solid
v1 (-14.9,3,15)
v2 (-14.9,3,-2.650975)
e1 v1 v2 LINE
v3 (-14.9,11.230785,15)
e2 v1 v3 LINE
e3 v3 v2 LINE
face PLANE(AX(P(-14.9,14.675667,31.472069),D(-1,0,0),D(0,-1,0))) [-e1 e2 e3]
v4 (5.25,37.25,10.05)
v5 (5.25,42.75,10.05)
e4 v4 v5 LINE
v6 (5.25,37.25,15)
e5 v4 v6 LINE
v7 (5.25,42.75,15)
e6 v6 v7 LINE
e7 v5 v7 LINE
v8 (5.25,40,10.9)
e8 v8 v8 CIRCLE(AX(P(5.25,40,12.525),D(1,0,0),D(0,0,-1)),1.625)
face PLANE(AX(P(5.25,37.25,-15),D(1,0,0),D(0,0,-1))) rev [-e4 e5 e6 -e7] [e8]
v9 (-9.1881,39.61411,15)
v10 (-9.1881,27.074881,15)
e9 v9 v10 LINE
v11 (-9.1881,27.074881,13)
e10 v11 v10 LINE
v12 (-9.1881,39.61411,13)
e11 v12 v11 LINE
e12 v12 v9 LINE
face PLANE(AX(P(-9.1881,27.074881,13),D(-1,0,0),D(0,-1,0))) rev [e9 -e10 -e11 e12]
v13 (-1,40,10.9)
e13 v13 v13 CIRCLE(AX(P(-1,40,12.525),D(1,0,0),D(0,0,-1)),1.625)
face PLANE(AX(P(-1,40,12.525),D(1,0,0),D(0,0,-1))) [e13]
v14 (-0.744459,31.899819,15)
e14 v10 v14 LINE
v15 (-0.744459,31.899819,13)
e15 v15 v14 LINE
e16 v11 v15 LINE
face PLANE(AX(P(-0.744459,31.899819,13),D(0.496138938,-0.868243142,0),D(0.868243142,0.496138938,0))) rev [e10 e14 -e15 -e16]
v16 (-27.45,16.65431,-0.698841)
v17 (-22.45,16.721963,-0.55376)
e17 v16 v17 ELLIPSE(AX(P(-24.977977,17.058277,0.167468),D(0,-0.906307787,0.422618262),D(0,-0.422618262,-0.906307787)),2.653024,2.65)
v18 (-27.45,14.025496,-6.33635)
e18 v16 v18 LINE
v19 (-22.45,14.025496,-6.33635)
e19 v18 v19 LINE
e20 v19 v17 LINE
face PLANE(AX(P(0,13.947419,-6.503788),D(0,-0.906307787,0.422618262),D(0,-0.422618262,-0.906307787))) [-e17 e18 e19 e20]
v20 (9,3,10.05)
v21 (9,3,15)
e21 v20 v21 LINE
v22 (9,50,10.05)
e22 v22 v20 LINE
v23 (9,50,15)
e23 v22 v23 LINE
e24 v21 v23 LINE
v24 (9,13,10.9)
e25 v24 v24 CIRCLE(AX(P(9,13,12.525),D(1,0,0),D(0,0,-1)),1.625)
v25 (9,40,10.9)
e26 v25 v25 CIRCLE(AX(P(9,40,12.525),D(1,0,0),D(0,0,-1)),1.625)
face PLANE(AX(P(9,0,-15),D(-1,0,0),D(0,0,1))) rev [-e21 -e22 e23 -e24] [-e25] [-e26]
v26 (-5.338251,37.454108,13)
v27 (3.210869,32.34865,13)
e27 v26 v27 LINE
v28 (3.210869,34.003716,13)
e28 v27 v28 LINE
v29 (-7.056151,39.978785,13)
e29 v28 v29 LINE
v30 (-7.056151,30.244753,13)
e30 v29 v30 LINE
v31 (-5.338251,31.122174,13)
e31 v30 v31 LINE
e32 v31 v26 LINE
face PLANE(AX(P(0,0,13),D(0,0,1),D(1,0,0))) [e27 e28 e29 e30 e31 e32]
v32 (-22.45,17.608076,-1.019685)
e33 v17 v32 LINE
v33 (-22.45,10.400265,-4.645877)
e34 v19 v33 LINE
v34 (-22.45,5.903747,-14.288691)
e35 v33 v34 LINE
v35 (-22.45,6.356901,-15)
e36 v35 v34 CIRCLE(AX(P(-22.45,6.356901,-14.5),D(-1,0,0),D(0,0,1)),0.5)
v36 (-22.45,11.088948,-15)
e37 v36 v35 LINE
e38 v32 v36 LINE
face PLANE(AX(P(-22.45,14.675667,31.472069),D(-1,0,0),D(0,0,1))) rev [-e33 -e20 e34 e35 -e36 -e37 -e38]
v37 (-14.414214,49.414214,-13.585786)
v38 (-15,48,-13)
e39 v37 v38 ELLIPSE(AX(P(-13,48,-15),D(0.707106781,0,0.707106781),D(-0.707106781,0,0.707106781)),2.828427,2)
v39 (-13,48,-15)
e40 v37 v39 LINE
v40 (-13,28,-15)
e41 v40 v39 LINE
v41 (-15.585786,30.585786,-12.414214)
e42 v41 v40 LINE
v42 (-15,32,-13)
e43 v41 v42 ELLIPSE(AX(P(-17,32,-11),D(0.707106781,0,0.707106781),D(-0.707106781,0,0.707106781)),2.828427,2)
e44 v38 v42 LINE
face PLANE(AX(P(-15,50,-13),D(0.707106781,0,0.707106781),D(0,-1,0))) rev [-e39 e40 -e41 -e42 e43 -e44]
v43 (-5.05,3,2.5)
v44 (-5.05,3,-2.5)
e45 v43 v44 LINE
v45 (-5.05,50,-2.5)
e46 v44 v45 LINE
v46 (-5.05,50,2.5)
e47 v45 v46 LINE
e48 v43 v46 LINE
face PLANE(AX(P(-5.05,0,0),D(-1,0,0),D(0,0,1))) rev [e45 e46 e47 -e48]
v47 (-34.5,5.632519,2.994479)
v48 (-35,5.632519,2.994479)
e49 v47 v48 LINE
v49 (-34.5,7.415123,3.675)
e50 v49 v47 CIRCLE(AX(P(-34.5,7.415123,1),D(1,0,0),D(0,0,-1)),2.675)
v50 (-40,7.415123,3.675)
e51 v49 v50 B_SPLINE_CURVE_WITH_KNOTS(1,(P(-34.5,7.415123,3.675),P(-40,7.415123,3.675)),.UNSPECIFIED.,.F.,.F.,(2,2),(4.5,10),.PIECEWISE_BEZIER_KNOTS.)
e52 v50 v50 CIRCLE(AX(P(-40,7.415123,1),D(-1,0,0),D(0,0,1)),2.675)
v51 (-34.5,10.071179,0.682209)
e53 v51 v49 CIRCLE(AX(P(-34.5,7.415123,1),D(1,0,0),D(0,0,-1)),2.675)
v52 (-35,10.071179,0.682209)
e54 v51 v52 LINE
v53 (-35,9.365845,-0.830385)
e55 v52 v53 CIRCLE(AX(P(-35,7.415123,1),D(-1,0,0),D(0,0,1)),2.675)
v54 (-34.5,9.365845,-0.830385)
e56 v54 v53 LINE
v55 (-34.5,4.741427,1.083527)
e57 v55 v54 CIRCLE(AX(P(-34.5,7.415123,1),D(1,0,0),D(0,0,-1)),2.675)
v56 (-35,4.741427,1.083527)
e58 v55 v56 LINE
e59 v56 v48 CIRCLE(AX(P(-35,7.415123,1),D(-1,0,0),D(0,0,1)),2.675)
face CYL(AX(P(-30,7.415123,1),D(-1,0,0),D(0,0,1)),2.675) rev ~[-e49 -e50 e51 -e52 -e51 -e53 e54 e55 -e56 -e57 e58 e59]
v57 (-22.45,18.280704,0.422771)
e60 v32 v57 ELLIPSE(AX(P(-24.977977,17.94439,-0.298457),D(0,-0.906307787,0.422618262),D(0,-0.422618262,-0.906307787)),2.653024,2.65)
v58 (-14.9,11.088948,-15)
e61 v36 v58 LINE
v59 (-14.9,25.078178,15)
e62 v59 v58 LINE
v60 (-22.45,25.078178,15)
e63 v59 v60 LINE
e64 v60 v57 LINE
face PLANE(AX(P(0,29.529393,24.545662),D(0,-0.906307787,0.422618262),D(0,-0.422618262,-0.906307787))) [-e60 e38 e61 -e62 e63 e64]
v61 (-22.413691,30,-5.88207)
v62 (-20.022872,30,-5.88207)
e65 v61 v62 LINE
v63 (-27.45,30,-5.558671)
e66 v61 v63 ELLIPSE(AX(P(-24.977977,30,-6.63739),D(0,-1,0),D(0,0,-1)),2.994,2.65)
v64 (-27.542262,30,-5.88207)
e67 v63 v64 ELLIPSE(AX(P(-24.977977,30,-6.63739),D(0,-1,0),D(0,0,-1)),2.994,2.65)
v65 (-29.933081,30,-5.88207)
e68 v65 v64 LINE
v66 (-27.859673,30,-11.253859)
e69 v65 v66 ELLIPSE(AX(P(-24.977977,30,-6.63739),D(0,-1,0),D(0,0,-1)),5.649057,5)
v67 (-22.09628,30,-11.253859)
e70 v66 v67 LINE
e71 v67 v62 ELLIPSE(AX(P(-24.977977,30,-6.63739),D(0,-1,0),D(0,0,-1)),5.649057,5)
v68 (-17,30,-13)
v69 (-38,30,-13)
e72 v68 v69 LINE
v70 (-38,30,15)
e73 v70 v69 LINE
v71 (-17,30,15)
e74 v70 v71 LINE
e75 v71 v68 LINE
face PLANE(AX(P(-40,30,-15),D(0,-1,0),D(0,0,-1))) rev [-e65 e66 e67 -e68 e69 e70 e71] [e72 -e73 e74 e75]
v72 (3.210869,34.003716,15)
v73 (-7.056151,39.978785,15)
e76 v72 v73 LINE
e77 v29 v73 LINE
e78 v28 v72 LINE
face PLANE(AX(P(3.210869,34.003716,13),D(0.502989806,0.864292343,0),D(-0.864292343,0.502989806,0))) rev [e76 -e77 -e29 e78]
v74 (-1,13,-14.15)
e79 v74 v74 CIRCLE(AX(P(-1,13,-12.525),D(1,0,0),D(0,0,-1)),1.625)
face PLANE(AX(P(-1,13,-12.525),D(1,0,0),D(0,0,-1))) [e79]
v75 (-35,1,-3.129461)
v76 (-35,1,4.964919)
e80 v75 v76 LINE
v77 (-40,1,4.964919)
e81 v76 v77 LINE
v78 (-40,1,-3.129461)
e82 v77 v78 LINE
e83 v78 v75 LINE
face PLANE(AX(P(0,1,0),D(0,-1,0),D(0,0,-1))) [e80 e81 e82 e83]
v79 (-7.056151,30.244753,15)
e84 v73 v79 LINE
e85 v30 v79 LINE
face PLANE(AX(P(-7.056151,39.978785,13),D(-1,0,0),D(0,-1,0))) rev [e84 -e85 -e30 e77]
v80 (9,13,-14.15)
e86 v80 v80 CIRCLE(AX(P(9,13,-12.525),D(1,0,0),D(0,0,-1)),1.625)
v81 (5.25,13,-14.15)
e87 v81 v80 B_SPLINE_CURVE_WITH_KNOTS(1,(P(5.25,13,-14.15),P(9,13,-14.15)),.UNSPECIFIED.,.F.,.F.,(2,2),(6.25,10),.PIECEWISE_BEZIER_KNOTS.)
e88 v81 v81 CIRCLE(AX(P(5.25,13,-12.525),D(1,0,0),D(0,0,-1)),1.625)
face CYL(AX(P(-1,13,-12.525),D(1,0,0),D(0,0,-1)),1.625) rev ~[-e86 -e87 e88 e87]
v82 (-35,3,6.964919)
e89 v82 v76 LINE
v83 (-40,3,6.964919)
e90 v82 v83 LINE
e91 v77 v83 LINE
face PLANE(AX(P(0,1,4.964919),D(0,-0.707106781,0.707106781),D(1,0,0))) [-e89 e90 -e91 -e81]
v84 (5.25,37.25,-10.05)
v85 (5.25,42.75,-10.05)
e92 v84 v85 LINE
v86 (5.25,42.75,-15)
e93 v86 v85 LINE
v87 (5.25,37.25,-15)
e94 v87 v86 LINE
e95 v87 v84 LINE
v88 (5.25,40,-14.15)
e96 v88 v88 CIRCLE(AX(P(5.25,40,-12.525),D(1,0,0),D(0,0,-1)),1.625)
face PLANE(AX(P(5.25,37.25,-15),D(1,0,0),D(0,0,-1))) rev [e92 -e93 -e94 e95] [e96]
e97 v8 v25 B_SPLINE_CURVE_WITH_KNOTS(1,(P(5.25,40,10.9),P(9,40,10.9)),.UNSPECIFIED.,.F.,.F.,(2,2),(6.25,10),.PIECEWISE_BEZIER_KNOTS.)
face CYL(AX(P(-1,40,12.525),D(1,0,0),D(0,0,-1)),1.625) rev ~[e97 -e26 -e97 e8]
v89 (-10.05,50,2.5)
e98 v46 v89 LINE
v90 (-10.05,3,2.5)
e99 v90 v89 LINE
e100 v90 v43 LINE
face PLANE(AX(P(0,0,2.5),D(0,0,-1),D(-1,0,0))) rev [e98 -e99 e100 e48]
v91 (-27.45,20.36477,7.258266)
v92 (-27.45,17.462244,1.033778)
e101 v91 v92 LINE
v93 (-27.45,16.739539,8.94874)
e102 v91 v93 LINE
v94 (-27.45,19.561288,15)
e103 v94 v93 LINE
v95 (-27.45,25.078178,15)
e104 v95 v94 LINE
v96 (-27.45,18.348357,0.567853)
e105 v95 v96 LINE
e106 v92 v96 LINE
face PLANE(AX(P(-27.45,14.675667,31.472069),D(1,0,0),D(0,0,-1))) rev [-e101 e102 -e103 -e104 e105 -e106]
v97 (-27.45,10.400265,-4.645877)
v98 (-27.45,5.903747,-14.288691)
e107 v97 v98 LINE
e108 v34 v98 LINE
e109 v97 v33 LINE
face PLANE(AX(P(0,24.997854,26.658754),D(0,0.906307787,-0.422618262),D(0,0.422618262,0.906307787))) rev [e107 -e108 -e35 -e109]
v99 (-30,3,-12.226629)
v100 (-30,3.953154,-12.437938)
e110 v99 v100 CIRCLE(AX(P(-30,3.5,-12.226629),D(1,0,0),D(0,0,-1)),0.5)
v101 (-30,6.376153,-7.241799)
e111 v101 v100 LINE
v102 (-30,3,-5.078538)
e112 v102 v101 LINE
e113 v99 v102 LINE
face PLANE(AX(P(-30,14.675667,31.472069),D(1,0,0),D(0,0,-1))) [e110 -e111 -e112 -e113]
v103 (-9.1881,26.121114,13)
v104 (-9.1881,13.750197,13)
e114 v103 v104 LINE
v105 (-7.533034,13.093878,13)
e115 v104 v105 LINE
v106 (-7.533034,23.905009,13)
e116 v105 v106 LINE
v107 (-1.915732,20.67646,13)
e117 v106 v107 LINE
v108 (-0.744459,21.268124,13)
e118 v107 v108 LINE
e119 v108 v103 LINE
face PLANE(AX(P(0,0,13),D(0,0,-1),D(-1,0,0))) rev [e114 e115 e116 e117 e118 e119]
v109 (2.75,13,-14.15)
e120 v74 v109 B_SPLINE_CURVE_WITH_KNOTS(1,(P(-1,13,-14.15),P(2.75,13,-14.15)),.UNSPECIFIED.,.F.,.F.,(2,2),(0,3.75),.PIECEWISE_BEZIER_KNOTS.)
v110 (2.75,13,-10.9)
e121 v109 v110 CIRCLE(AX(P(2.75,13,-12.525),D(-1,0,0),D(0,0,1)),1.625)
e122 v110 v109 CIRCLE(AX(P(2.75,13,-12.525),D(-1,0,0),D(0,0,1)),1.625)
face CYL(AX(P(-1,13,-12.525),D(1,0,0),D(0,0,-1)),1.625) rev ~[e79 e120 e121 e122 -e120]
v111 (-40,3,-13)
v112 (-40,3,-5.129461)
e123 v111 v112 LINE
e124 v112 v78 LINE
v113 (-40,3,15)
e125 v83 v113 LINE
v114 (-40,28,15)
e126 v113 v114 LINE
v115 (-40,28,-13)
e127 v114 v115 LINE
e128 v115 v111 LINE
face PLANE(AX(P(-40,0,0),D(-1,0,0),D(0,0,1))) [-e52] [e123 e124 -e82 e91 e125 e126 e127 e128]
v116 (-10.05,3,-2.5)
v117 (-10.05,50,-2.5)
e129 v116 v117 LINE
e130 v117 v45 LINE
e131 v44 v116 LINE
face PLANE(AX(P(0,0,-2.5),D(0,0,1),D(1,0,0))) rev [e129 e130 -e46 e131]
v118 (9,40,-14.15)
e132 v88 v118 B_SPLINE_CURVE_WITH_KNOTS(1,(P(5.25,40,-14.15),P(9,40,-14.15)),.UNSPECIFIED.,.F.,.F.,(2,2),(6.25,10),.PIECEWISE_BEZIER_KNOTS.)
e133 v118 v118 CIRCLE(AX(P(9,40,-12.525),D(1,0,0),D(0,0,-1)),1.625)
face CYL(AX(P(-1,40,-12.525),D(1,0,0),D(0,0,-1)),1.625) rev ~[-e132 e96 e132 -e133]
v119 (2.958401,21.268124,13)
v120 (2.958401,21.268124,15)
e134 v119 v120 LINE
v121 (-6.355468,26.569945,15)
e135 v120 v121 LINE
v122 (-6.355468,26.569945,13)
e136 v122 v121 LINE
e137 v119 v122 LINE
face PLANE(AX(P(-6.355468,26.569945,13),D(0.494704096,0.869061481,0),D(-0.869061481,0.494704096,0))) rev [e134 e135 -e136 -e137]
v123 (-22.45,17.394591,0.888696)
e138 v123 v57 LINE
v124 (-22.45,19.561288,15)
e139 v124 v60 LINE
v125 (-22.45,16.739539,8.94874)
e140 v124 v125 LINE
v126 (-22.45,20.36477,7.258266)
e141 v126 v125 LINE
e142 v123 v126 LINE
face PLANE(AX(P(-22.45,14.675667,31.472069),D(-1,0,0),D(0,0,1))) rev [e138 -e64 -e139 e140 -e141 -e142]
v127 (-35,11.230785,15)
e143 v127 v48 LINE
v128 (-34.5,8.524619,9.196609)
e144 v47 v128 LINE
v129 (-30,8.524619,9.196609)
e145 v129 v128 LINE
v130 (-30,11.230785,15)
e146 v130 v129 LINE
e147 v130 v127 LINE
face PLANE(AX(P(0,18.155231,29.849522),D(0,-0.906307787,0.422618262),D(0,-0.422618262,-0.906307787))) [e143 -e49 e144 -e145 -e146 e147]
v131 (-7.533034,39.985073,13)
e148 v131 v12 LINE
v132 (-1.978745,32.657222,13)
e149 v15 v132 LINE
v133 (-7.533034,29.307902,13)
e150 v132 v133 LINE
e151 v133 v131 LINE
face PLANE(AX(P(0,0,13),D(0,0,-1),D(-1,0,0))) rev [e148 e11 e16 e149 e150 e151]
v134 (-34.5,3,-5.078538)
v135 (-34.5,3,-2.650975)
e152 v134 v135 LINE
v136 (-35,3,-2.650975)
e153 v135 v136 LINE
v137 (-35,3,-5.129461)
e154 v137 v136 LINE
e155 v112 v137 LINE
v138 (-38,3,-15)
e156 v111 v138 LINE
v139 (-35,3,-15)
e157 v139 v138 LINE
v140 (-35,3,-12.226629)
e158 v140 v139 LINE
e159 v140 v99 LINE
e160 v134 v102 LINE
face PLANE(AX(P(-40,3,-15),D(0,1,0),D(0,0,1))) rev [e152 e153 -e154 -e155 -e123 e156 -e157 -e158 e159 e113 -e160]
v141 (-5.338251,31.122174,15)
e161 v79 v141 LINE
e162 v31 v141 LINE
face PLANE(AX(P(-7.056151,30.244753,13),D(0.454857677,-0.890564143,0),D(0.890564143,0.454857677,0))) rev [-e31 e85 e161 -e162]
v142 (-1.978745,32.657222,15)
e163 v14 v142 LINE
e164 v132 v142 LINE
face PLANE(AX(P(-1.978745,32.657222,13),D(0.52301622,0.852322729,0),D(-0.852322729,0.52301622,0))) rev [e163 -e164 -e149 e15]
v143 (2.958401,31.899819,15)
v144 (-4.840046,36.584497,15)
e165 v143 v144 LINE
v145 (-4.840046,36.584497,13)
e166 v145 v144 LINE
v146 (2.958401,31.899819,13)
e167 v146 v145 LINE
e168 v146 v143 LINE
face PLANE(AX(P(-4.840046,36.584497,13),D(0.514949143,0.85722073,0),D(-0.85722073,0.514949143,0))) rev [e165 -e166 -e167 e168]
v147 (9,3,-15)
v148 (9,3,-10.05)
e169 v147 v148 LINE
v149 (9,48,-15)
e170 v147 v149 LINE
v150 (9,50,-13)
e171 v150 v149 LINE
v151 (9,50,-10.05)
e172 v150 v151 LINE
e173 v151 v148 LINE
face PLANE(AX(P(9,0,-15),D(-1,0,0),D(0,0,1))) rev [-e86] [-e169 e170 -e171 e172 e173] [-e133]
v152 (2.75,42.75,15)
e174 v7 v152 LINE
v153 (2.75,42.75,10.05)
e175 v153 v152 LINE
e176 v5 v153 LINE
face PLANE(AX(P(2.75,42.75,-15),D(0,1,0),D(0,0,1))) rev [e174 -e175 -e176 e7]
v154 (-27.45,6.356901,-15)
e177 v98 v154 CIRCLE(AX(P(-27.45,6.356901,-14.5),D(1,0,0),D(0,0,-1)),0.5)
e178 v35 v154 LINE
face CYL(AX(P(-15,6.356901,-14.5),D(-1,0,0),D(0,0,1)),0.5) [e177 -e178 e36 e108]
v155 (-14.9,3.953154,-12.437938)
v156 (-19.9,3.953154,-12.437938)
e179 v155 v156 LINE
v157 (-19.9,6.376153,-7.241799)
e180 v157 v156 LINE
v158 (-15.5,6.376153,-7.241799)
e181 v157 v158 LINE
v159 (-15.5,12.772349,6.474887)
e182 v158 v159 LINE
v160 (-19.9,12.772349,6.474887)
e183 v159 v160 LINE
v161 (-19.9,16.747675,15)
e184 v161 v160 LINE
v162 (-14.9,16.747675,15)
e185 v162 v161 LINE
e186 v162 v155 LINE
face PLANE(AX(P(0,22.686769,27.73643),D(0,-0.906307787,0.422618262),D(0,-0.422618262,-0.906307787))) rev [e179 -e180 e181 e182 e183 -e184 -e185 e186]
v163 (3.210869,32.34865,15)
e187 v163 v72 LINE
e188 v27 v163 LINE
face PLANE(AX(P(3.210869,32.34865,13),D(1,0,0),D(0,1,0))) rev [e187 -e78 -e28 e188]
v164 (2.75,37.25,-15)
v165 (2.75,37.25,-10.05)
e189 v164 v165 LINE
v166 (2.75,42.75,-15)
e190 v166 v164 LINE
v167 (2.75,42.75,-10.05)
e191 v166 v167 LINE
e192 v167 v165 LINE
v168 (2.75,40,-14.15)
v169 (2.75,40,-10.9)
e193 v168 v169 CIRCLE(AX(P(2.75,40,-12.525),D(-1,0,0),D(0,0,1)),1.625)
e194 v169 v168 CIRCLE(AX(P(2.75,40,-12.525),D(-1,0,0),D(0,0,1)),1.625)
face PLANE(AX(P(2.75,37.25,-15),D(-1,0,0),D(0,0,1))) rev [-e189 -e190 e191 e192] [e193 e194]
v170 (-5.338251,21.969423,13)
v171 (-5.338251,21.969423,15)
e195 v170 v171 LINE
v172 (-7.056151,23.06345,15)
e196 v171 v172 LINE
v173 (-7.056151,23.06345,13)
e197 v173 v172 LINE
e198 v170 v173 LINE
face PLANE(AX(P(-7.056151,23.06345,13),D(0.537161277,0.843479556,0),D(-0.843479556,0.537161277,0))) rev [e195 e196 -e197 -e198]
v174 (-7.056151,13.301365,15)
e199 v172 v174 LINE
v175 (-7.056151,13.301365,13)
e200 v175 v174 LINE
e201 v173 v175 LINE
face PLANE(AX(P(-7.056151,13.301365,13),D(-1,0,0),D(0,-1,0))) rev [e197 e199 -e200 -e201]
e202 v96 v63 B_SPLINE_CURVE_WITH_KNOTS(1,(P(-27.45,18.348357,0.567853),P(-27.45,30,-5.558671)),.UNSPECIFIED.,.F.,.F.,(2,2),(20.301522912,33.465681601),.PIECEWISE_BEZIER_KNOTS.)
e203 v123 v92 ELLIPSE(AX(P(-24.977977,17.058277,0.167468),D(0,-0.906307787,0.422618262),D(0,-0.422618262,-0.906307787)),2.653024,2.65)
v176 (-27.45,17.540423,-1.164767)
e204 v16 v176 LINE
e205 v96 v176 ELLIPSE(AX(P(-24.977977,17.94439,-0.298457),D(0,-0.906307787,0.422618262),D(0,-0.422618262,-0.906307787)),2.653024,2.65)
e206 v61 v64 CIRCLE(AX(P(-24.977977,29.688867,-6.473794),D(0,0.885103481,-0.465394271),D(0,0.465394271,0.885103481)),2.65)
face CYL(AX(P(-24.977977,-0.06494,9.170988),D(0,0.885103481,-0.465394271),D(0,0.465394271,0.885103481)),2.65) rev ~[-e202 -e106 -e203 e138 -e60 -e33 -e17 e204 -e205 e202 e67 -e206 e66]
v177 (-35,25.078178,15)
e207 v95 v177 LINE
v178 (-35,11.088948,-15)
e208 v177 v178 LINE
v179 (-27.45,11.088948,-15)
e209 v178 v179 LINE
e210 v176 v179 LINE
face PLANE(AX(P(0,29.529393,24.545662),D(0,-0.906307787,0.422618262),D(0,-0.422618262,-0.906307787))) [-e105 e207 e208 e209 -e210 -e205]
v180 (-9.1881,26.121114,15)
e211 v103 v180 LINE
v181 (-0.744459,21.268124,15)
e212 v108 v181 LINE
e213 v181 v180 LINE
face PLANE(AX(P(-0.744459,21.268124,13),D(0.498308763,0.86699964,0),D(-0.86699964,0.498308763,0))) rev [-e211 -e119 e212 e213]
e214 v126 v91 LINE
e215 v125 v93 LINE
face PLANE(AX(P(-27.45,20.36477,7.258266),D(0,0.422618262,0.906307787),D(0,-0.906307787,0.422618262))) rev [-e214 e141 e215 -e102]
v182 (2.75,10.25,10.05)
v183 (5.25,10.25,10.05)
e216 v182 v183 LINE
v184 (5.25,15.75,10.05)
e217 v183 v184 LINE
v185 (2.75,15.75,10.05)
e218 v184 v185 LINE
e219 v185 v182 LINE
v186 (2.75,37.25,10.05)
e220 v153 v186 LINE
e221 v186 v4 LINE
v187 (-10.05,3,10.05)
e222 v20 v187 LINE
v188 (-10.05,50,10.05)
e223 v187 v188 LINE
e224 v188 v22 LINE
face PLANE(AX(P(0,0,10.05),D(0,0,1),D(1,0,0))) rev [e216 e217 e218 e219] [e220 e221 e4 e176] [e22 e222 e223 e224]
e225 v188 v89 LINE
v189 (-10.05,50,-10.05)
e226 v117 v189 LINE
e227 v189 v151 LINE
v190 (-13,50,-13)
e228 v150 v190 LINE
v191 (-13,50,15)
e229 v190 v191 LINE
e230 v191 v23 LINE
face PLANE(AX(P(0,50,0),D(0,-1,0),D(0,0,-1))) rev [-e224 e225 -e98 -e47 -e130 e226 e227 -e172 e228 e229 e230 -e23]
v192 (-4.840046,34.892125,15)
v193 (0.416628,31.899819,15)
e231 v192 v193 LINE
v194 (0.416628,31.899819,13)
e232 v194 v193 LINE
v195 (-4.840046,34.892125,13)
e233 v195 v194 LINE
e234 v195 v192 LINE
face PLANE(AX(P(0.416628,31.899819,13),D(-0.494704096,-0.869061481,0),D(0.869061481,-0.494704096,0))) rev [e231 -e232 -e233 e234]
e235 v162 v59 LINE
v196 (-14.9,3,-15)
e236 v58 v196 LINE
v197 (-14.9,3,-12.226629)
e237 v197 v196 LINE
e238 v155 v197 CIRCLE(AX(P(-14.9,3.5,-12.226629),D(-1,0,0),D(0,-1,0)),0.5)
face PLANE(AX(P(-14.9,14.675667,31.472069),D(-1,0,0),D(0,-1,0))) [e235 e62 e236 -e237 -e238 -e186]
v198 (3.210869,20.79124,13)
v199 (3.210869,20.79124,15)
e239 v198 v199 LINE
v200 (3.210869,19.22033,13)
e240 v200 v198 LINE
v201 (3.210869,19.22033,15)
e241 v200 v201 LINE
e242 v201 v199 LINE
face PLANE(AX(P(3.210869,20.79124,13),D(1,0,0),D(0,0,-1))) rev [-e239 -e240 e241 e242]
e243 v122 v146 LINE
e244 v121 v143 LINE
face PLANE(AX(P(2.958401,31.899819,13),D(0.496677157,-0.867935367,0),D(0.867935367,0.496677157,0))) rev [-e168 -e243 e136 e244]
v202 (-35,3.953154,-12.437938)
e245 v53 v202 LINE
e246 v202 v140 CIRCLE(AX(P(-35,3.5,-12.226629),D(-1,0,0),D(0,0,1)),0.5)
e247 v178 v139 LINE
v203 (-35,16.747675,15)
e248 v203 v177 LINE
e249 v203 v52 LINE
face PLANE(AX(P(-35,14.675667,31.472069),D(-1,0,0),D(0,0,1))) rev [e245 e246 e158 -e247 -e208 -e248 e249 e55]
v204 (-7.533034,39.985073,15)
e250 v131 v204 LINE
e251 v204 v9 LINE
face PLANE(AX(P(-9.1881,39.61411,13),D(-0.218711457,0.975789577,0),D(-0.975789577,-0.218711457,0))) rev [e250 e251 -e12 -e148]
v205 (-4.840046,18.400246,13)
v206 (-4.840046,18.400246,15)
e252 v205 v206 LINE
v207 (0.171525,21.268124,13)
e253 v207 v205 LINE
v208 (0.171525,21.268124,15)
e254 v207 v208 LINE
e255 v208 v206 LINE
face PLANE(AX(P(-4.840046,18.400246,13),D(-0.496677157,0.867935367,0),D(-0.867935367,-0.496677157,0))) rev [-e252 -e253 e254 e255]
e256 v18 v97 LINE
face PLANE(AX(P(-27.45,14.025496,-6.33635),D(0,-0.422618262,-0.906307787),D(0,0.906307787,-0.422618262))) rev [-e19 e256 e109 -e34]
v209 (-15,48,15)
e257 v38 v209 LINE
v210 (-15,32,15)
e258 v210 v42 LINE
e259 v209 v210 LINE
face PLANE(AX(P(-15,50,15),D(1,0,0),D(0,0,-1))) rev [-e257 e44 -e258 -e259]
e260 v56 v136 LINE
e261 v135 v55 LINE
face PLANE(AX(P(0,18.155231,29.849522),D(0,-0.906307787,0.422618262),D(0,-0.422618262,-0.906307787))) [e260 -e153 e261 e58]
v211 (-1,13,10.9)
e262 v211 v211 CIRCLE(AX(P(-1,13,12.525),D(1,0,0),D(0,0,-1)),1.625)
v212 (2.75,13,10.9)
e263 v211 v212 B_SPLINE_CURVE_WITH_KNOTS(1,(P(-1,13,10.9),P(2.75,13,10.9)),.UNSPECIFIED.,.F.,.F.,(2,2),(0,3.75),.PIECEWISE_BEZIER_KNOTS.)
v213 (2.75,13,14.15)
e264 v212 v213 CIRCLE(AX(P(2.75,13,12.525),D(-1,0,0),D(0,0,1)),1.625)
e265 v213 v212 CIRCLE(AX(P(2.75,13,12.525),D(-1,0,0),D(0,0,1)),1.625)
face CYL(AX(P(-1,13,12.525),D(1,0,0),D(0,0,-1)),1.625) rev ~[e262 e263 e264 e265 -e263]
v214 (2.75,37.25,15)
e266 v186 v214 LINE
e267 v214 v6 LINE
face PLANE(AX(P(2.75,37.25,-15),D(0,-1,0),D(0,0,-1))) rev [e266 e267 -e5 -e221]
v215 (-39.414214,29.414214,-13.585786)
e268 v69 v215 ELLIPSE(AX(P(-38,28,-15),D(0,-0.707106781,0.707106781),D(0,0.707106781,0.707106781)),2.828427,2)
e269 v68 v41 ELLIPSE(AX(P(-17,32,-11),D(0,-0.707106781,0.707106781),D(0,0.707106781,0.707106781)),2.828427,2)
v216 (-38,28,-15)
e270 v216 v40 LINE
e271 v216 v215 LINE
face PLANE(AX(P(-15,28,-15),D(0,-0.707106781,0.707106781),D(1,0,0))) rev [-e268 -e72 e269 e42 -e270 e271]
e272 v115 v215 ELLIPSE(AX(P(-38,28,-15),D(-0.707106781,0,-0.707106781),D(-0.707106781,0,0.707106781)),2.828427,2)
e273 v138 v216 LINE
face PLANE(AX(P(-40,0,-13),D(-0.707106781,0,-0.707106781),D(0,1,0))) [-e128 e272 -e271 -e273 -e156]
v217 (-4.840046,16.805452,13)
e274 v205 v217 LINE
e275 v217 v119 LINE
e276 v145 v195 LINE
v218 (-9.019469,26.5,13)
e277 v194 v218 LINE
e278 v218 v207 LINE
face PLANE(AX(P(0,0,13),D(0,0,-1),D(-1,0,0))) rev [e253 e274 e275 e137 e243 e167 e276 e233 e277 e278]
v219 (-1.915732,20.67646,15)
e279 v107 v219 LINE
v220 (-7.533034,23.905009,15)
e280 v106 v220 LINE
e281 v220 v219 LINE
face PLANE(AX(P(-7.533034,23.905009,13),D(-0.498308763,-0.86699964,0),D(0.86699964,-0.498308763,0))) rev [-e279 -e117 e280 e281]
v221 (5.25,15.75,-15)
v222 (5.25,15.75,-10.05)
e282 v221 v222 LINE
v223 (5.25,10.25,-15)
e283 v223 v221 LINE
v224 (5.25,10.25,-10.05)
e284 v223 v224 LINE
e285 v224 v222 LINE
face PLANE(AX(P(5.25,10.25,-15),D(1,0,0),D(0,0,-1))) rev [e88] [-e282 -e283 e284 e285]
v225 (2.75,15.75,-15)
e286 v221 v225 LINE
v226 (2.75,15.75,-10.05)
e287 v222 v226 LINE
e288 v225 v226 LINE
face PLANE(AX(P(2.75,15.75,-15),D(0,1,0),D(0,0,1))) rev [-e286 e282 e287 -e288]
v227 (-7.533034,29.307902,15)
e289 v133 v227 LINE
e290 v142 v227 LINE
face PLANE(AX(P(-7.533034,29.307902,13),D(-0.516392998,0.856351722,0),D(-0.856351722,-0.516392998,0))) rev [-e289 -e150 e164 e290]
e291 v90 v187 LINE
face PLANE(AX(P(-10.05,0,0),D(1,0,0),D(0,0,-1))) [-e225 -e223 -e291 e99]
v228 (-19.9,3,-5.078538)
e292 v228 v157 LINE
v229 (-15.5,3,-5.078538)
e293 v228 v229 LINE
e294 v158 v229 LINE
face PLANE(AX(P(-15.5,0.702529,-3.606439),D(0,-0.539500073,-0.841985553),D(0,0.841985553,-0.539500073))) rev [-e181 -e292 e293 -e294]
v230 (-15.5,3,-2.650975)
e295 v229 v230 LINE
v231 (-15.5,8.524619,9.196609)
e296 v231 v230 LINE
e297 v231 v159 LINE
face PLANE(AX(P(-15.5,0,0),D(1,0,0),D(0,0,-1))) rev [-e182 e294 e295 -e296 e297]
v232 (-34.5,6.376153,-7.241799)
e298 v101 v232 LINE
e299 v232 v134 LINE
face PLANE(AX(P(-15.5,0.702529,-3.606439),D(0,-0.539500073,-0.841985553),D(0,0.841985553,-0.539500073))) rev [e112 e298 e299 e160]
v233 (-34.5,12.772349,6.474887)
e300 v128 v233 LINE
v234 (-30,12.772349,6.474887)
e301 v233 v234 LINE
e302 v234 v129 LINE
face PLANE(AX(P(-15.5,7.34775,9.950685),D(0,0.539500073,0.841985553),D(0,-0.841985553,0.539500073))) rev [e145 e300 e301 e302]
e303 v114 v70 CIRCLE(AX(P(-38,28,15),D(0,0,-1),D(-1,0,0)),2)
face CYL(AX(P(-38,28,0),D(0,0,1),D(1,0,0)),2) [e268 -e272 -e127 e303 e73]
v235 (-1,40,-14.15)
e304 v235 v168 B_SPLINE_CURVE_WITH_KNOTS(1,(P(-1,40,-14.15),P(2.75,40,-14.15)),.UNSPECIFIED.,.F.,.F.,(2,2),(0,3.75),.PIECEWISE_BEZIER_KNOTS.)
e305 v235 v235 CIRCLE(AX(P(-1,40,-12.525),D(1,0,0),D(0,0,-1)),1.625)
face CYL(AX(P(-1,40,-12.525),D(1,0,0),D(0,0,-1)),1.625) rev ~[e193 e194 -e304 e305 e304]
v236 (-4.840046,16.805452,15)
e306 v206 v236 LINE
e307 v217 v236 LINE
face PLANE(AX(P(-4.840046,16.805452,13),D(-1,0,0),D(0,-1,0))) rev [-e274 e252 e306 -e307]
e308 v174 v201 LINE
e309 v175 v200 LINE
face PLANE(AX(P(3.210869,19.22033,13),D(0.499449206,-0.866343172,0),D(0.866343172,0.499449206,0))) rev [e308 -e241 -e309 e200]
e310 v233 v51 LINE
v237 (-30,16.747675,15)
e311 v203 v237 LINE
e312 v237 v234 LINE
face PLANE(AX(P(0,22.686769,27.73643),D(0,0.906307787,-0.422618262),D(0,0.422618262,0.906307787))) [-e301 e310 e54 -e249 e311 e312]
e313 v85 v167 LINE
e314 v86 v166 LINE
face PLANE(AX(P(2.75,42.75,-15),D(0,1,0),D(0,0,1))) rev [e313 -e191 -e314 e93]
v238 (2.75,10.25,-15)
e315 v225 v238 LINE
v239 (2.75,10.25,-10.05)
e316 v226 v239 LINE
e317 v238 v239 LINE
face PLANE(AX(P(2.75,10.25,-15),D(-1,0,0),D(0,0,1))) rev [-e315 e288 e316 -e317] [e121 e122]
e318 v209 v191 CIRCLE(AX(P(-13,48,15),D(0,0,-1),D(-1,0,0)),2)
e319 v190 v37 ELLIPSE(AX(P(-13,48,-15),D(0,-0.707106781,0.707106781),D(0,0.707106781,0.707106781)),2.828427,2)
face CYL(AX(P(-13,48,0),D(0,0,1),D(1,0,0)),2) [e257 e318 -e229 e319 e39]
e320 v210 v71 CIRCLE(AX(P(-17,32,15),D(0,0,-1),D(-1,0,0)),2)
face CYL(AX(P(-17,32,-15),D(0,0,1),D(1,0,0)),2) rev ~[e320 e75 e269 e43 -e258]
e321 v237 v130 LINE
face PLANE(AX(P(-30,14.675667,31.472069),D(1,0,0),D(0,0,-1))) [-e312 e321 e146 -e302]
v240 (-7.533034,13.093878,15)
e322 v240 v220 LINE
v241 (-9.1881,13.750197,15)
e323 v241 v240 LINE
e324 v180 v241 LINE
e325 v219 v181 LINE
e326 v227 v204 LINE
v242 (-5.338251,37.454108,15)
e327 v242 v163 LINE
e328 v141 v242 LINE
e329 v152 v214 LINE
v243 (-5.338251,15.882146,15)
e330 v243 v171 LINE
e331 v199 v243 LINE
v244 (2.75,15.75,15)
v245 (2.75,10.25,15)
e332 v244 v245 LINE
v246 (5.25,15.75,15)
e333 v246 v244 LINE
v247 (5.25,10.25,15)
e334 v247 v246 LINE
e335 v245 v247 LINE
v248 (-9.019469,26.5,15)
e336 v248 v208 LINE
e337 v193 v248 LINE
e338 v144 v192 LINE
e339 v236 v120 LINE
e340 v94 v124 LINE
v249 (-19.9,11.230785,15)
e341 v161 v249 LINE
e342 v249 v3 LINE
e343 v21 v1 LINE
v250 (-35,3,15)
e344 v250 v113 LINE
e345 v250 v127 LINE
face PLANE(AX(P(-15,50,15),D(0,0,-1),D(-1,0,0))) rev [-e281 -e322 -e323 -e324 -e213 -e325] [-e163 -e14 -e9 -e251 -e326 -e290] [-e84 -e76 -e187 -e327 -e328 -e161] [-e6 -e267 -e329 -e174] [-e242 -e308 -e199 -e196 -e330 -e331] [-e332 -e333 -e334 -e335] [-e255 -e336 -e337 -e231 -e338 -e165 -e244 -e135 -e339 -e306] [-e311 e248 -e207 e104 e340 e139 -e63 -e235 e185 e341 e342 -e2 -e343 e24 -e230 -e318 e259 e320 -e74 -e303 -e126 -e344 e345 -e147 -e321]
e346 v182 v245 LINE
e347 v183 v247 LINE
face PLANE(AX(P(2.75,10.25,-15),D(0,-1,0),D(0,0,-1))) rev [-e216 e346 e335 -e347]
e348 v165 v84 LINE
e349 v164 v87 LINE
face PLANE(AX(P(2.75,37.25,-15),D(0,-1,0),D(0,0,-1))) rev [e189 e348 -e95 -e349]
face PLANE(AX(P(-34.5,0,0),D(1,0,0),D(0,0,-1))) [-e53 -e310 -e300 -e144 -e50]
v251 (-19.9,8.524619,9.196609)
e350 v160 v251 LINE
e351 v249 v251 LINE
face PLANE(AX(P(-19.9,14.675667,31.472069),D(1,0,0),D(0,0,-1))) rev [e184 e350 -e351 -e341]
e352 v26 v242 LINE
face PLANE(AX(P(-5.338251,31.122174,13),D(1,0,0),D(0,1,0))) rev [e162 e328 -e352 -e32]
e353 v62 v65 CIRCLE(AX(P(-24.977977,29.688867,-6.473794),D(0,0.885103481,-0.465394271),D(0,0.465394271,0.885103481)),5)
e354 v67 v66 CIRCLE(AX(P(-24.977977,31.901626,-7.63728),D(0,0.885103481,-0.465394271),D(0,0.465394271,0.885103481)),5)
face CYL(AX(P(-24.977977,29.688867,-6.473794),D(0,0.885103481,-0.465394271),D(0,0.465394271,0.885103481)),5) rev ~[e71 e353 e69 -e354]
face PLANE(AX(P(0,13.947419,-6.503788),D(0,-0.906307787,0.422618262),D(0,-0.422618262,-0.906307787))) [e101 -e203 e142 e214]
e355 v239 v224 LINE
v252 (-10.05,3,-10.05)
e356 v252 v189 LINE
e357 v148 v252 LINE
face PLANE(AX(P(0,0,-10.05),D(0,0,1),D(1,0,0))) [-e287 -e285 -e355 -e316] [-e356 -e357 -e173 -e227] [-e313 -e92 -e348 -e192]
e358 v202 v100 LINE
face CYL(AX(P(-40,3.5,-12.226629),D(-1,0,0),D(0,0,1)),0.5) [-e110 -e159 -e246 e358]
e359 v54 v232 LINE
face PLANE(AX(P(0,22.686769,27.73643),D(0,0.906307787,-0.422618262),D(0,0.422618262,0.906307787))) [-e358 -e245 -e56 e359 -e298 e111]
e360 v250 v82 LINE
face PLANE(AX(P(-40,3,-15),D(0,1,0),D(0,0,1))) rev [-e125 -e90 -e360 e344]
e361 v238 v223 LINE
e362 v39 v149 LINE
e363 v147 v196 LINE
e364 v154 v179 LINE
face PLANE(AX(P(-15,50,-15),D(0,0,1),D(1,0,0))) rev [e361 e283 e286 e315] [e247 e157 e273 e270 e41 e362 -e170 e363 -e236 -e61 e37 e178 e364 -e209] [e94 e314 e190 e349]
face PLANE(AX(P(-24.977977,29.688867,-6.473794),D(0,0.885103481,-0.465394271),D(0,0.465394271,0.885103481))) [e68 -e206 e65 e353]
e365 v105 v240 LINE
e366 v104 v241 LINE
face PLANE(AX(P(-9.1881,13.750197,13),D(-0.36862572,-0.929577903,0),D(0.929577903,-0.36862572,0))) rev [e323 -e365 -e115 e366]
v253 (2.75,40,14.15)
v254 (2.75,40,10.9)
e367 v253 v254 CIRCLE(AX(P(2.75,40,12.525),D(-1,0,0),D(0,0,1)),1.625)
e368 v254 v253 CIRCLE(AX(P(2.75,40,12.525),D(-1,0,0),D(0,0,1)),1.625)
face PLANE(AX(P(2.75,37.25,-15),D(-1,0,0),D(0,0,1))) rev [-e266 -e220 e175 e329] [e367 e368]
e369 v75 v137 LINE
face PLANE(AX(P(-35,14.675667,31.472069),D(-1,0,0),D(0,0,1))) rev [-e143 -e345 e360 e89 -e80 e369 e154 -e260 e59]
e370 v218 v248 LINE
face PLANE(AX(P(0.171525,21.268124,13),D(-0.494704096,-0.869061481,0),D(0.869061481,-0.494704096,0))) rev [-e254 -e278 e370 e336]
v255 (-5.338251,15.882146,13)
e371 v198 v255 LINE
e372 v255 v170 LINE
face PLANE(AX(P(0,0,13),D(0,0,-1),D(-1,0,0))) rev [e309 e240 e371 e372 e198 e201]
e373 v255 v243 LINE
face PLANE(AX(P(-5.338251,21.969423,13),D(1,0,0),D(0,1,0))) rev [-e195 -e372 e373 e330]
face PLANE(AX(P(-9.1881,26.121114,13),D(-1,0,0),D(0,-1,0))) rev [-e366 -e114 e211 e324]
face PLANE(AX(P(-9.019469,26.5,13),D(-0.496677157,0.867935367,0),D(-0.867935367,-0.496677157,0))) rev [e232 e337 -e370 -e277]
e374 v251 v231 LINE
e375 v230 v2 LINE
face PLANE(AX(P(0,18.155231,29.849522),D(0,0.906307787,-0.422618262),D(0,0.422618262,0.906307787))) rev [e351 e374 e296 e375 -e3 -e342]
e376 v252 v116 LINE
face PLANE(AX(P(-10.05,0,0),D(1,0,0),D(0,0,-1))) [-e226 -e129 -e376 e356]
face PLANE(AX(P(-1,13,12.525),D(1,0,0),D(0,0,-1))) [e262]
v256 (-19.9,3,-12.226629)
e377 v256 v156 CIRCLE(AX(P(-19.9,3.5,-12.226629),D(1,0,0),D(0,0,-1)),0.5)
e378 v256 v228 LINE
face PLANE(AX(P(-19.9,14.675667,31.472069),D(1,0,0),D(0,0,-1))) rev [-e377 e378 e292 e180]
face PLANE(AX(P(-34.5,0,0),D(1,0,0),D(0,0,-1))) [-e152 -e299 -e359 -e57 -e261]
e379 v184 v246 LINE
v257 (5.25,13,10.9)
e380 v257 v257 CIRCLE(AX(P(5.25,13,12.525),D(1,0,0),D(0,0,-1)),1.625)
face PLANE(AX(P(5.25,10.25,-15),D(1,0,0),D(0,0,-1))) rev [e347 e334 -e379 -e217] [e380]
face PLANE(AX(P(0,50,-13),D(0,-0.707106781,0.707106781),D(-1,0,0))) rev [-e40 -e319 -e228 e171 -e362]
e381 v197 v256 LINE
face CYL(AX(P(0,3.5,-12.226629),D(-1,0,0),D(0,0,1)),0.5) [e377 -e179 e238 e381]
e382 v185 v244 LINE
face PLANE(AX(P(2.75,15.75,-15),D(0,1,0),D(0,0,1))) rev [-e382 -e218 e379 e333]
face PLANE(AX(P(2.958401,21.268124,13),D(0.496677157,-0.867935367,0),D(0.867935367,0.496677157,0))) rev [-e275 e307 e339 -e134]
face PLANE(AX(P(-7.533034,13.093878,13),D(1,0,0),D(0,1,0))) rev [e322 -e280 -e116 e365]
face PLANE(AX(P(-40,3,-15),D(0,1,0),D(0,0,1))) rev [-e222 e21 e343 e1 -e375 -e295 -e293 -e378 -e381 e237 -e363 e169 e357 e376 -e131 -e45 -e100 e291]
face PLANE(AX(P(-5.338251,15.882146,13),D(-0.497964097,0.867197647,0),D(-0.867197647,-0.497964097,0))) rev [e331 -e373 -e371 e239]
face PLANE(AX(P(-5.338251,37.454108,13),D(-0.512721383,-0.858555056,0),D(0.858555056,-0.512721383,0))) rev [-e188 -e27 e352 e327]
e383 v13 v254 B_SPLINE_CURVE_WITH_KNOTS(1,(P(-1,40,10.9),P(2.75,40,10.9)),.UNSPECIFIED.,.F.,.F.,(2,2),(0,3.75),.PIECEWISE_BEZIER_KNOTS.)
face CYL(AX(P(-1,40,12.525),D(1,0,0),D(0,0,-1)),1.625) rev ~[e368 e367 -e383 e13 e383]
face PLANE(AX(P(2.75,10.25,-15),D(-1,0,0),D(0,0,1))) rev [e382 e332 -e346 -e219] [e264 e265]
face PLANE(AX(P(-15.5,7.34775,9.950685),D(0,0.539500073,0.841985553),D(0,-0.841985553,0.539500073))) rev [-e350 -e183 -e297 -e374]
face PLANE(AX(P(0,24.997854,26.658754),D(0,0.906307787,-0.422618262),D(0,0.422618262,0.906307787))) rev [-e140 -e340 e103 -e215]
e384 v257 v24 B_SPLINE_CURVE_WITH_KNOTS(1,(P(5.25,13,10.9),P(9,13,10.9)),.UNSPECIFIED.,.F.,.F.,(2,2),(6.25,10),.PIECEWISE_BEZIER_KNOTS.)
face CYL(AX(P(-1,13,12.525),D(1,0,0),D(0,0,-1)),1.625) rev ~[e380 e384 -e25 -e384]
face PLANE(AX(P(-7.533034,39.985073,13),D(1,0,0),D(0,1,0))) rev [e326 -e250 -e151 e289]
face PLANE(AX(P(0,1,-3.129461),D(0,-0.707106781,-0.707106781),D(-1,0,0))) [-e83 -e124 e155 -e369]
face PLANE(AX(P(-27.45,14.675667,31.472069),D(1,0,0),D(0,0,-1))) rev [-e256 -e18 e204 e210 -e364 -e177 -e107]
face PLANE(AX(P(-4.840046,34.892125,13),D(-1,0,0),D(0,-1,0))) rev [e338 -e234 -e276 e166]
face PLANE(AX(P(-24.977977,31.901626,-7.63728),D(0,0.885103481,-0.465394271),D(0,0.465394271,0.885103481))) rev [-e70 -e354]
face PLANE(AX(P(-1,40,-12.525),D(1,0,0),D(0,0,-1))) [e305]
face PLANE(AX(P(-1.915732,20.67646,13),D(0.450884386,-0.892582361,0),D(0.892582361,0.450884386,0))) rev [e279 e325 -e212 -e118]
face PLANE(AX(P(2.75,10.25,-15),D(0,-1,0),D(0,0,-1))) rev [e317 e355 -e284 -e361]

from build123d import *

# Parameters (mm, degrees)
SKETCH1_W                       = 30
SKETCH1_H                       = 30
BOSS_EXTRUDE1_DEPTH             = 50
CUT_EXTRUDE1_DEPTH              = 55.313902456
SKETCH3_W                       = 6
SKETCH3_H                       = 30
CUT_EXTRUDE2_DEPTH              = 55.313902456
SKETCH5_W                       = 30
SKETCH5_H                       = 30
BOSS_EXTRUDE2_DEPTH             = 25
F_45_DEGREE_EXTRUSION_CUT_DEPTH = 73.926037689
SKETCH11_R                      = 1.625
CUT_EXTRUDE7_DEPTH              = 10
CHAMFER1_SIZE                   = 2
FILLET1_R                       = 2
SKETCH16_R                      = 2.675
CUT_EXTRUDE10_DEPTH             = 10
CUT_EXTRUDE11_DEPTH             = 9.5
FILLET2_R                       = 0.5
FILLET3_R                       = 0.5
SKETCH19_W                      = 49
SKETCH19_H                      = 3
CUT_EXTRUDE12_DEPTH             = 71.710678119
SKETCH20_W                      = 6.753728314
SKETCH20_H                      = 6.253099935
CUT_EXTRUDE13_DEPTH             = 15
SKETCH22_R                      = 2.65
CUT_EXTRUDE14_DEPTH             = 51.035604398
SKETCH23_R                      = 5
CUT_EXTRUDE15_DEPTH             = 2.5
SKETCH24_W                      = 5
SKETCH24_H                      = 15
CUT_EXTRUDE16_DEPTH             = 4
SKETCH25_W                      = 5
SKETCH25_H                      = 12.094379765
BOSS_EXTRUDE3_DEPTH             = 2
CHAMFER2_SIZE                   = 2
SKETCH26_W                      = 2.5
SKETCH26_H                      = 5.5
CUT_EXTRUDE17_DEPTH             = 71.710678119
FILLET4_R                       = 0.5
CUT_EXTRUDE18_DEPTH             = 2


with BuildPart() as part:
    # Sketch1 → Boss-Extrude1 (new body)
    with BuildSketch(Plane(origin=(0, 0, 0), x_dir=(1, 0, 0), z_dir=(0, 1, 0))):
        Rectangle(SKETCH1_W, SKETCH1_H)
    extrude(amount=BOSS_EXTRUDE1_DEPTH)

    # Sketch2 → Cut-Extrude1 (cut, through all)
    with BuildSketch(Plane(origin=(0, 50, 0), x_dir=(1, 0, 0), z_dir=(0, 1, 0))):
        Polygon((-10.05, -2.5), (-10.05, -10.05), (10.05, -10.05), (10.05, 10.05), (-10.05, 10.05), (-10.05, 2.5), (-5.05, 2.5), (-5.05, -2.5), align=None)
    extrude(amount=-CUT_EXTRUDE1_DEPTH, mode=Mode.SUBTRACT)

    # Sketch3 → Cut-Extrude2 (cut, through all)
    with BuildSketch(Plane(origin=(0, 50, 0), x_dir=(1, 0, 0), z_dir=(0, 1, 0))):
        with Locations((12, 0)):
            Rectangle(SKETCH3_W, SKETCH3_H)
    extrude(amount=-CUT_EXTRUDE2_DEPTH, mode=Mode.SUBTRACT)

    # Sketch5 → Boss-Extrude2 (add)
    with BuildSketch(Plane.ZY.offset(15)):
        with Locations((0, 15)):
            Rectangle(SKETCH5_W, SKETCH5_H)
    extrude(amount=BOSS_EXTRUDE2_DEPTH)

    # Sketch7 → 45 degree extrusion cut (cut, through all)
    with BuildSketch(Plane(origin=(-40, 12.069825676, -23.451382923), x_dir=(-1, 0, 0), z_dir=(0, -0.42261826174069717, -0.9063077870366509))):
        Polygon((-25.1, -17.010685759), (-25.1, -24.560685759), (-17.55, -24.560685759), (-17.55, -19.560685759), (-12.55, -19.560685759), (-12.55, -24.560685759), (-5, -24.560685759), (-5, -17.010685759), (-10, -17.010685759), (-10, -14.510685759), (-20.1, -14.510685759), (-20.1, -17.010685759), align=None)
        Polygon((-25.1, -4.460685759), (-25.1, -12.010685759), (-20.1, -12.010685759), (-20.1, -14.510685759), (-10, -14.510685759), (-10, -12.010685759), (-5, -12.010685759), (-5, -4.460685759), (-12.55, -4.460685759), (-12.55, -9.460685759), (-17.55, -9.460685759), (-17.55, -4.460685759), align=None)
    extrude(amount=-F_45_DEGREE_EXTRUSION_CUT_DEPTH, mode=Mode.SUBTRACT)

    # Sketch11 → Cut-Extrude7 (cut)
    with BuildSketch(Plane(origin=(9, 0, 0), x_dir=(0, 0, -1), z_dir=(1, 0, 0))):
        with Locations((-12.525, 40)):
            Circle(SKETCH11_R)
        with Locations((12.525, 40)):
            Circle(SKETCH11_R)
        with Locations((12.525, 13)):
            Circle(SKETCH11_R)
        with Locations((-12.525, 13)):
            Circle(SKETCH11_R)
    extrude(amount=-CUT_EXTRUDE7_DEPTH, mode=Mode.SUBTRACT)

    # Chamfer1
    chamfer1_edges = [part.edges().sort_by_distance(p)[0] for p in [
        (-5.45, 0, -15),
        (-3, 50, -15),
        (-27.5, 30, -15),
        (-40, 15, -15),
        (-15, 40, -15),
        (-35, 0, -15),
    ]]
    chamfer(chamfer1_edges, length=CHAMFER1_SIZE)

    # Fillet1
    fillet1_edges = [part.edges().sort_by_distance(p)[0] for p in [
        (-15, 50, 1),
        (-15, 30, 1),
        (-40, 30, 1),
        (-40, 0, 1),
    ]]
    fillet(fillet1_edges, radius=FILLET1_R)

    # Sketch16 → Cut-Extrude10 (cut)
    with BuildSketch(Plane.ZY.offset(40)):
        with Locations((1, 7.415122828)):
            Circle(SKETCH16_R)
    extrude(amount=-CUT_EXTRUDE10_DEPTH, mode=Mode.SUBTRACT)

    # Sketch18 → Cut-Extrude11 (cut, symmetric)
    with BuildSketch(Plane.ZY.offset(25)):
        Polygon((9.950685103, 7.347750191), (5.606439218, 14.127716409), (-7.950685103, 7.482495466), (-3.606439218, 0.702529248), align=None)
    extrude(amount=CUT_EXTRUDE11_DEPTH, both=True, mode=Mode.SUBTRACT)

    # Fillet2
    fillet2_edges = [part.edges().sort_by_distance(p)[0] for p in [
        (-24.95, 0, -3.050682005),
    ]]
    fillet(fillet2_edges, radius=FILLET2_R)

    # Fillet3
    fillet3_edges = [part.edges().sort_by_distance(p)[0] for p in [
        (-24.95, 8.417171254, 15),
    ]]
    fillet(fillet3_edges, radius=FILLET3_R)

    # Sketch19 → Cut-Extrude12 (cut, through all)
    with BuildSketch(Plane.XY.offset(15)):
        with Locations((-15.5, 1.5)):
            Rectangle(SKETCH19_W, SKETCH19_H)
    extrude(amount=-CUT_EXTRUDE12_DEPTH, mode=Mode.SUBTRACT)


with BuildPart() as cut_extrude12_piece_1:
    # of the separate pieces the step leaves, piece 1, a body of its own (cut_extrude12_pieces)
    add(part.part.solids().sort_by_distance((-14.9, 3, 15))[0])

    # Sketch22 → Cut-Extrude14 (cut, through all)
    with BuildSketch(Plane(origin=(-25, 31.908299393, -7.624586929), x_dir=(1, 0, 0), z_dir=(3.142436568436473e-15, 0.8851034809979968, -0.46539427147874146))):
        with Locations(Location((0.022023463, 0.014340274, 0), (0, 0, 201.118214674))):
            Circle(SKETCH22_R)
    extrude(amount=-CUT_EXTRUDE14_DEPTH, mode=Mode.SUBTRACT)

    # Sketch23 → Cut-Extrude15 (cut)
    with BuildSketch(Plane(origin=(-25, 31.908299393, -7.624586929), x_dir=(1, 0, 0), z_dir=(3.142436568436473e-15, 0.8851034809979968, -0.46539427147874146))):
        with Locations((0.022023463, 0.014340274)):
            Circle(SKETCH23_R)
    extrude(amount=-CUT_EXTRUDE15_DEPTH, mode=Mode.SUBTRACT)

    # Sketch24 → Cut-Extrude16 (cut)
    with BuildSketch(Plane(origin=(0, 10.322187648, -4.813315149), x_dir=(1, 0, 0), z_dir=(0, -0.906307787036651, 0.4226182617406971))):
        with Locations((-24.95, 7.684747226)):
            Rectangle(SKETCH24_W, SKETCH24_H)
    extrude(amount=-CUT_EXTRUDE16_DEPTH, mode=Mode.SUBTRACT)

    # Sketch25 → Boss-Extrude3 (add)
    with BuildSketch(Plane.XZ.offset(-3)):
        with Locations((-37.5, 0.91772931)):
            Rectangle(SKETCH25_W, SKETCH25_H)
    extrude(amount=BOSS_EXTRUDE3_DEPTH)

    # Chamfer2
    chamfer2_edges = [cut_extrude12_piece_1.edges().sort_by_distance(p)[0] for p in [
        (-37.5, 1, -5.129460572),
        (-37.5, 1, 6.964919193),
    ]]
    chamfer(chamfer2_edges, length=CHAMFER2_SIZE - 0.0001)  # a hair under: the kernel refuses the full size

    # Sketch26 → Cut-Extrude17 (cut, through all)
    with BuildSketch(Plane.XY.offset(15)):
        with Locations((4, 40)):
            Rectangle(SKETCH26_W, SKETCH26_H)
        with Locations((4, 13)):
            Rectangle(SKETCH26_W, SKETCH26_H)
    extrude(amount=-CUT_EXTRUDE17_DEPTH, mode=Mode.SUBTRACT)

    # Fillet4
    fillet4_edges = [cut_extrude12_piece_1.edges().sort_by_distance(p)[0] for p in [
        (-32.5, 3, -14.481983196),
        (-24.95, 5.572058491, -15),
        (-17.4, 3, -14.481983196),
    ]]
    fillet(fillet4_edges, radius=FILLET4_R)

    # Mobious Logo → Cut-Extrude18 (cut)
    with BuildSketch(Plane(origin=(0, 0, 15), x_dir=(-1, 0, 0), z_dir=(0, 0, 1))):
        Polygon((-3.210868628, -32.348650408), (-3.210868628, -34.003716414), (7.056151005, -39.978785217), (7.056151005, -30.244752942), (5.33825141, -31.122174097), (5.33825141, -37.454108258), align=None)
        Polygon((1.978745121, -32.657222036), (0.744458608, -31.899818949), (9.188100437, -27.07488076), (9.188100437, -39.614109657), (7.533034431, -39.985072727), (7.533034431, -29.307901849), align=None)
        Polygon((4.840045674, -36.584497306), (-2.958400932, -31.899818949), (6.355467669, -26.569945368), (-2.958400932, -21.268123754), (4.840045674, -16.805452407), (4.840045674, -18.400245934), (-0.171524822, -21.268123754), (9.019468658, -26.5), (-0.416628352, -31.899818949), (4.840045674, -34.892125279), align=None)
        Polygon((-3.210868628, -20.791240329), (-3.210868628, -19.220330221), (7.056151005, -13.30136535), (7.056151005, -23.063449592), (5.33825141, -21.96942291), (5.33825141, -15.882146242), align=None)
        Polygon((0.744458608, -21.268123754), (9.188100437, -26.121113909), (9.188100437, -13.75019681), (7.533034431, -13.093877531), (7.533034431, -23.905008578), (1.915732347, -20.67645954), align=None)
    extrude(amount=-CUT_EXTRUDE18_DEPTH, mode=Mode.SUBTRACT)


with BuildPart() as cut_extrude12_piece_2:
    # of the separate pieces the step leaves, piece 2, a body of its own (cut_extrude12_pieces)
    add(part.part.solids().sort_by_distance((-27.45, 3, 15))[0])

    # Sketch20 → Cut-Extrude13 (cut)
    with BuildSketch(Plane.XY.offset(15)):
        with Locations((-25.201643275, 5.301831254)):
            Rectangle(SKETCH20_W, SKETCH20_H)
    extrude(amount=-CUT_EXTRUDE13_DEPTH, mode=Mode.SUBTRACT)


solid = cut_extrude12_piece_1.part
